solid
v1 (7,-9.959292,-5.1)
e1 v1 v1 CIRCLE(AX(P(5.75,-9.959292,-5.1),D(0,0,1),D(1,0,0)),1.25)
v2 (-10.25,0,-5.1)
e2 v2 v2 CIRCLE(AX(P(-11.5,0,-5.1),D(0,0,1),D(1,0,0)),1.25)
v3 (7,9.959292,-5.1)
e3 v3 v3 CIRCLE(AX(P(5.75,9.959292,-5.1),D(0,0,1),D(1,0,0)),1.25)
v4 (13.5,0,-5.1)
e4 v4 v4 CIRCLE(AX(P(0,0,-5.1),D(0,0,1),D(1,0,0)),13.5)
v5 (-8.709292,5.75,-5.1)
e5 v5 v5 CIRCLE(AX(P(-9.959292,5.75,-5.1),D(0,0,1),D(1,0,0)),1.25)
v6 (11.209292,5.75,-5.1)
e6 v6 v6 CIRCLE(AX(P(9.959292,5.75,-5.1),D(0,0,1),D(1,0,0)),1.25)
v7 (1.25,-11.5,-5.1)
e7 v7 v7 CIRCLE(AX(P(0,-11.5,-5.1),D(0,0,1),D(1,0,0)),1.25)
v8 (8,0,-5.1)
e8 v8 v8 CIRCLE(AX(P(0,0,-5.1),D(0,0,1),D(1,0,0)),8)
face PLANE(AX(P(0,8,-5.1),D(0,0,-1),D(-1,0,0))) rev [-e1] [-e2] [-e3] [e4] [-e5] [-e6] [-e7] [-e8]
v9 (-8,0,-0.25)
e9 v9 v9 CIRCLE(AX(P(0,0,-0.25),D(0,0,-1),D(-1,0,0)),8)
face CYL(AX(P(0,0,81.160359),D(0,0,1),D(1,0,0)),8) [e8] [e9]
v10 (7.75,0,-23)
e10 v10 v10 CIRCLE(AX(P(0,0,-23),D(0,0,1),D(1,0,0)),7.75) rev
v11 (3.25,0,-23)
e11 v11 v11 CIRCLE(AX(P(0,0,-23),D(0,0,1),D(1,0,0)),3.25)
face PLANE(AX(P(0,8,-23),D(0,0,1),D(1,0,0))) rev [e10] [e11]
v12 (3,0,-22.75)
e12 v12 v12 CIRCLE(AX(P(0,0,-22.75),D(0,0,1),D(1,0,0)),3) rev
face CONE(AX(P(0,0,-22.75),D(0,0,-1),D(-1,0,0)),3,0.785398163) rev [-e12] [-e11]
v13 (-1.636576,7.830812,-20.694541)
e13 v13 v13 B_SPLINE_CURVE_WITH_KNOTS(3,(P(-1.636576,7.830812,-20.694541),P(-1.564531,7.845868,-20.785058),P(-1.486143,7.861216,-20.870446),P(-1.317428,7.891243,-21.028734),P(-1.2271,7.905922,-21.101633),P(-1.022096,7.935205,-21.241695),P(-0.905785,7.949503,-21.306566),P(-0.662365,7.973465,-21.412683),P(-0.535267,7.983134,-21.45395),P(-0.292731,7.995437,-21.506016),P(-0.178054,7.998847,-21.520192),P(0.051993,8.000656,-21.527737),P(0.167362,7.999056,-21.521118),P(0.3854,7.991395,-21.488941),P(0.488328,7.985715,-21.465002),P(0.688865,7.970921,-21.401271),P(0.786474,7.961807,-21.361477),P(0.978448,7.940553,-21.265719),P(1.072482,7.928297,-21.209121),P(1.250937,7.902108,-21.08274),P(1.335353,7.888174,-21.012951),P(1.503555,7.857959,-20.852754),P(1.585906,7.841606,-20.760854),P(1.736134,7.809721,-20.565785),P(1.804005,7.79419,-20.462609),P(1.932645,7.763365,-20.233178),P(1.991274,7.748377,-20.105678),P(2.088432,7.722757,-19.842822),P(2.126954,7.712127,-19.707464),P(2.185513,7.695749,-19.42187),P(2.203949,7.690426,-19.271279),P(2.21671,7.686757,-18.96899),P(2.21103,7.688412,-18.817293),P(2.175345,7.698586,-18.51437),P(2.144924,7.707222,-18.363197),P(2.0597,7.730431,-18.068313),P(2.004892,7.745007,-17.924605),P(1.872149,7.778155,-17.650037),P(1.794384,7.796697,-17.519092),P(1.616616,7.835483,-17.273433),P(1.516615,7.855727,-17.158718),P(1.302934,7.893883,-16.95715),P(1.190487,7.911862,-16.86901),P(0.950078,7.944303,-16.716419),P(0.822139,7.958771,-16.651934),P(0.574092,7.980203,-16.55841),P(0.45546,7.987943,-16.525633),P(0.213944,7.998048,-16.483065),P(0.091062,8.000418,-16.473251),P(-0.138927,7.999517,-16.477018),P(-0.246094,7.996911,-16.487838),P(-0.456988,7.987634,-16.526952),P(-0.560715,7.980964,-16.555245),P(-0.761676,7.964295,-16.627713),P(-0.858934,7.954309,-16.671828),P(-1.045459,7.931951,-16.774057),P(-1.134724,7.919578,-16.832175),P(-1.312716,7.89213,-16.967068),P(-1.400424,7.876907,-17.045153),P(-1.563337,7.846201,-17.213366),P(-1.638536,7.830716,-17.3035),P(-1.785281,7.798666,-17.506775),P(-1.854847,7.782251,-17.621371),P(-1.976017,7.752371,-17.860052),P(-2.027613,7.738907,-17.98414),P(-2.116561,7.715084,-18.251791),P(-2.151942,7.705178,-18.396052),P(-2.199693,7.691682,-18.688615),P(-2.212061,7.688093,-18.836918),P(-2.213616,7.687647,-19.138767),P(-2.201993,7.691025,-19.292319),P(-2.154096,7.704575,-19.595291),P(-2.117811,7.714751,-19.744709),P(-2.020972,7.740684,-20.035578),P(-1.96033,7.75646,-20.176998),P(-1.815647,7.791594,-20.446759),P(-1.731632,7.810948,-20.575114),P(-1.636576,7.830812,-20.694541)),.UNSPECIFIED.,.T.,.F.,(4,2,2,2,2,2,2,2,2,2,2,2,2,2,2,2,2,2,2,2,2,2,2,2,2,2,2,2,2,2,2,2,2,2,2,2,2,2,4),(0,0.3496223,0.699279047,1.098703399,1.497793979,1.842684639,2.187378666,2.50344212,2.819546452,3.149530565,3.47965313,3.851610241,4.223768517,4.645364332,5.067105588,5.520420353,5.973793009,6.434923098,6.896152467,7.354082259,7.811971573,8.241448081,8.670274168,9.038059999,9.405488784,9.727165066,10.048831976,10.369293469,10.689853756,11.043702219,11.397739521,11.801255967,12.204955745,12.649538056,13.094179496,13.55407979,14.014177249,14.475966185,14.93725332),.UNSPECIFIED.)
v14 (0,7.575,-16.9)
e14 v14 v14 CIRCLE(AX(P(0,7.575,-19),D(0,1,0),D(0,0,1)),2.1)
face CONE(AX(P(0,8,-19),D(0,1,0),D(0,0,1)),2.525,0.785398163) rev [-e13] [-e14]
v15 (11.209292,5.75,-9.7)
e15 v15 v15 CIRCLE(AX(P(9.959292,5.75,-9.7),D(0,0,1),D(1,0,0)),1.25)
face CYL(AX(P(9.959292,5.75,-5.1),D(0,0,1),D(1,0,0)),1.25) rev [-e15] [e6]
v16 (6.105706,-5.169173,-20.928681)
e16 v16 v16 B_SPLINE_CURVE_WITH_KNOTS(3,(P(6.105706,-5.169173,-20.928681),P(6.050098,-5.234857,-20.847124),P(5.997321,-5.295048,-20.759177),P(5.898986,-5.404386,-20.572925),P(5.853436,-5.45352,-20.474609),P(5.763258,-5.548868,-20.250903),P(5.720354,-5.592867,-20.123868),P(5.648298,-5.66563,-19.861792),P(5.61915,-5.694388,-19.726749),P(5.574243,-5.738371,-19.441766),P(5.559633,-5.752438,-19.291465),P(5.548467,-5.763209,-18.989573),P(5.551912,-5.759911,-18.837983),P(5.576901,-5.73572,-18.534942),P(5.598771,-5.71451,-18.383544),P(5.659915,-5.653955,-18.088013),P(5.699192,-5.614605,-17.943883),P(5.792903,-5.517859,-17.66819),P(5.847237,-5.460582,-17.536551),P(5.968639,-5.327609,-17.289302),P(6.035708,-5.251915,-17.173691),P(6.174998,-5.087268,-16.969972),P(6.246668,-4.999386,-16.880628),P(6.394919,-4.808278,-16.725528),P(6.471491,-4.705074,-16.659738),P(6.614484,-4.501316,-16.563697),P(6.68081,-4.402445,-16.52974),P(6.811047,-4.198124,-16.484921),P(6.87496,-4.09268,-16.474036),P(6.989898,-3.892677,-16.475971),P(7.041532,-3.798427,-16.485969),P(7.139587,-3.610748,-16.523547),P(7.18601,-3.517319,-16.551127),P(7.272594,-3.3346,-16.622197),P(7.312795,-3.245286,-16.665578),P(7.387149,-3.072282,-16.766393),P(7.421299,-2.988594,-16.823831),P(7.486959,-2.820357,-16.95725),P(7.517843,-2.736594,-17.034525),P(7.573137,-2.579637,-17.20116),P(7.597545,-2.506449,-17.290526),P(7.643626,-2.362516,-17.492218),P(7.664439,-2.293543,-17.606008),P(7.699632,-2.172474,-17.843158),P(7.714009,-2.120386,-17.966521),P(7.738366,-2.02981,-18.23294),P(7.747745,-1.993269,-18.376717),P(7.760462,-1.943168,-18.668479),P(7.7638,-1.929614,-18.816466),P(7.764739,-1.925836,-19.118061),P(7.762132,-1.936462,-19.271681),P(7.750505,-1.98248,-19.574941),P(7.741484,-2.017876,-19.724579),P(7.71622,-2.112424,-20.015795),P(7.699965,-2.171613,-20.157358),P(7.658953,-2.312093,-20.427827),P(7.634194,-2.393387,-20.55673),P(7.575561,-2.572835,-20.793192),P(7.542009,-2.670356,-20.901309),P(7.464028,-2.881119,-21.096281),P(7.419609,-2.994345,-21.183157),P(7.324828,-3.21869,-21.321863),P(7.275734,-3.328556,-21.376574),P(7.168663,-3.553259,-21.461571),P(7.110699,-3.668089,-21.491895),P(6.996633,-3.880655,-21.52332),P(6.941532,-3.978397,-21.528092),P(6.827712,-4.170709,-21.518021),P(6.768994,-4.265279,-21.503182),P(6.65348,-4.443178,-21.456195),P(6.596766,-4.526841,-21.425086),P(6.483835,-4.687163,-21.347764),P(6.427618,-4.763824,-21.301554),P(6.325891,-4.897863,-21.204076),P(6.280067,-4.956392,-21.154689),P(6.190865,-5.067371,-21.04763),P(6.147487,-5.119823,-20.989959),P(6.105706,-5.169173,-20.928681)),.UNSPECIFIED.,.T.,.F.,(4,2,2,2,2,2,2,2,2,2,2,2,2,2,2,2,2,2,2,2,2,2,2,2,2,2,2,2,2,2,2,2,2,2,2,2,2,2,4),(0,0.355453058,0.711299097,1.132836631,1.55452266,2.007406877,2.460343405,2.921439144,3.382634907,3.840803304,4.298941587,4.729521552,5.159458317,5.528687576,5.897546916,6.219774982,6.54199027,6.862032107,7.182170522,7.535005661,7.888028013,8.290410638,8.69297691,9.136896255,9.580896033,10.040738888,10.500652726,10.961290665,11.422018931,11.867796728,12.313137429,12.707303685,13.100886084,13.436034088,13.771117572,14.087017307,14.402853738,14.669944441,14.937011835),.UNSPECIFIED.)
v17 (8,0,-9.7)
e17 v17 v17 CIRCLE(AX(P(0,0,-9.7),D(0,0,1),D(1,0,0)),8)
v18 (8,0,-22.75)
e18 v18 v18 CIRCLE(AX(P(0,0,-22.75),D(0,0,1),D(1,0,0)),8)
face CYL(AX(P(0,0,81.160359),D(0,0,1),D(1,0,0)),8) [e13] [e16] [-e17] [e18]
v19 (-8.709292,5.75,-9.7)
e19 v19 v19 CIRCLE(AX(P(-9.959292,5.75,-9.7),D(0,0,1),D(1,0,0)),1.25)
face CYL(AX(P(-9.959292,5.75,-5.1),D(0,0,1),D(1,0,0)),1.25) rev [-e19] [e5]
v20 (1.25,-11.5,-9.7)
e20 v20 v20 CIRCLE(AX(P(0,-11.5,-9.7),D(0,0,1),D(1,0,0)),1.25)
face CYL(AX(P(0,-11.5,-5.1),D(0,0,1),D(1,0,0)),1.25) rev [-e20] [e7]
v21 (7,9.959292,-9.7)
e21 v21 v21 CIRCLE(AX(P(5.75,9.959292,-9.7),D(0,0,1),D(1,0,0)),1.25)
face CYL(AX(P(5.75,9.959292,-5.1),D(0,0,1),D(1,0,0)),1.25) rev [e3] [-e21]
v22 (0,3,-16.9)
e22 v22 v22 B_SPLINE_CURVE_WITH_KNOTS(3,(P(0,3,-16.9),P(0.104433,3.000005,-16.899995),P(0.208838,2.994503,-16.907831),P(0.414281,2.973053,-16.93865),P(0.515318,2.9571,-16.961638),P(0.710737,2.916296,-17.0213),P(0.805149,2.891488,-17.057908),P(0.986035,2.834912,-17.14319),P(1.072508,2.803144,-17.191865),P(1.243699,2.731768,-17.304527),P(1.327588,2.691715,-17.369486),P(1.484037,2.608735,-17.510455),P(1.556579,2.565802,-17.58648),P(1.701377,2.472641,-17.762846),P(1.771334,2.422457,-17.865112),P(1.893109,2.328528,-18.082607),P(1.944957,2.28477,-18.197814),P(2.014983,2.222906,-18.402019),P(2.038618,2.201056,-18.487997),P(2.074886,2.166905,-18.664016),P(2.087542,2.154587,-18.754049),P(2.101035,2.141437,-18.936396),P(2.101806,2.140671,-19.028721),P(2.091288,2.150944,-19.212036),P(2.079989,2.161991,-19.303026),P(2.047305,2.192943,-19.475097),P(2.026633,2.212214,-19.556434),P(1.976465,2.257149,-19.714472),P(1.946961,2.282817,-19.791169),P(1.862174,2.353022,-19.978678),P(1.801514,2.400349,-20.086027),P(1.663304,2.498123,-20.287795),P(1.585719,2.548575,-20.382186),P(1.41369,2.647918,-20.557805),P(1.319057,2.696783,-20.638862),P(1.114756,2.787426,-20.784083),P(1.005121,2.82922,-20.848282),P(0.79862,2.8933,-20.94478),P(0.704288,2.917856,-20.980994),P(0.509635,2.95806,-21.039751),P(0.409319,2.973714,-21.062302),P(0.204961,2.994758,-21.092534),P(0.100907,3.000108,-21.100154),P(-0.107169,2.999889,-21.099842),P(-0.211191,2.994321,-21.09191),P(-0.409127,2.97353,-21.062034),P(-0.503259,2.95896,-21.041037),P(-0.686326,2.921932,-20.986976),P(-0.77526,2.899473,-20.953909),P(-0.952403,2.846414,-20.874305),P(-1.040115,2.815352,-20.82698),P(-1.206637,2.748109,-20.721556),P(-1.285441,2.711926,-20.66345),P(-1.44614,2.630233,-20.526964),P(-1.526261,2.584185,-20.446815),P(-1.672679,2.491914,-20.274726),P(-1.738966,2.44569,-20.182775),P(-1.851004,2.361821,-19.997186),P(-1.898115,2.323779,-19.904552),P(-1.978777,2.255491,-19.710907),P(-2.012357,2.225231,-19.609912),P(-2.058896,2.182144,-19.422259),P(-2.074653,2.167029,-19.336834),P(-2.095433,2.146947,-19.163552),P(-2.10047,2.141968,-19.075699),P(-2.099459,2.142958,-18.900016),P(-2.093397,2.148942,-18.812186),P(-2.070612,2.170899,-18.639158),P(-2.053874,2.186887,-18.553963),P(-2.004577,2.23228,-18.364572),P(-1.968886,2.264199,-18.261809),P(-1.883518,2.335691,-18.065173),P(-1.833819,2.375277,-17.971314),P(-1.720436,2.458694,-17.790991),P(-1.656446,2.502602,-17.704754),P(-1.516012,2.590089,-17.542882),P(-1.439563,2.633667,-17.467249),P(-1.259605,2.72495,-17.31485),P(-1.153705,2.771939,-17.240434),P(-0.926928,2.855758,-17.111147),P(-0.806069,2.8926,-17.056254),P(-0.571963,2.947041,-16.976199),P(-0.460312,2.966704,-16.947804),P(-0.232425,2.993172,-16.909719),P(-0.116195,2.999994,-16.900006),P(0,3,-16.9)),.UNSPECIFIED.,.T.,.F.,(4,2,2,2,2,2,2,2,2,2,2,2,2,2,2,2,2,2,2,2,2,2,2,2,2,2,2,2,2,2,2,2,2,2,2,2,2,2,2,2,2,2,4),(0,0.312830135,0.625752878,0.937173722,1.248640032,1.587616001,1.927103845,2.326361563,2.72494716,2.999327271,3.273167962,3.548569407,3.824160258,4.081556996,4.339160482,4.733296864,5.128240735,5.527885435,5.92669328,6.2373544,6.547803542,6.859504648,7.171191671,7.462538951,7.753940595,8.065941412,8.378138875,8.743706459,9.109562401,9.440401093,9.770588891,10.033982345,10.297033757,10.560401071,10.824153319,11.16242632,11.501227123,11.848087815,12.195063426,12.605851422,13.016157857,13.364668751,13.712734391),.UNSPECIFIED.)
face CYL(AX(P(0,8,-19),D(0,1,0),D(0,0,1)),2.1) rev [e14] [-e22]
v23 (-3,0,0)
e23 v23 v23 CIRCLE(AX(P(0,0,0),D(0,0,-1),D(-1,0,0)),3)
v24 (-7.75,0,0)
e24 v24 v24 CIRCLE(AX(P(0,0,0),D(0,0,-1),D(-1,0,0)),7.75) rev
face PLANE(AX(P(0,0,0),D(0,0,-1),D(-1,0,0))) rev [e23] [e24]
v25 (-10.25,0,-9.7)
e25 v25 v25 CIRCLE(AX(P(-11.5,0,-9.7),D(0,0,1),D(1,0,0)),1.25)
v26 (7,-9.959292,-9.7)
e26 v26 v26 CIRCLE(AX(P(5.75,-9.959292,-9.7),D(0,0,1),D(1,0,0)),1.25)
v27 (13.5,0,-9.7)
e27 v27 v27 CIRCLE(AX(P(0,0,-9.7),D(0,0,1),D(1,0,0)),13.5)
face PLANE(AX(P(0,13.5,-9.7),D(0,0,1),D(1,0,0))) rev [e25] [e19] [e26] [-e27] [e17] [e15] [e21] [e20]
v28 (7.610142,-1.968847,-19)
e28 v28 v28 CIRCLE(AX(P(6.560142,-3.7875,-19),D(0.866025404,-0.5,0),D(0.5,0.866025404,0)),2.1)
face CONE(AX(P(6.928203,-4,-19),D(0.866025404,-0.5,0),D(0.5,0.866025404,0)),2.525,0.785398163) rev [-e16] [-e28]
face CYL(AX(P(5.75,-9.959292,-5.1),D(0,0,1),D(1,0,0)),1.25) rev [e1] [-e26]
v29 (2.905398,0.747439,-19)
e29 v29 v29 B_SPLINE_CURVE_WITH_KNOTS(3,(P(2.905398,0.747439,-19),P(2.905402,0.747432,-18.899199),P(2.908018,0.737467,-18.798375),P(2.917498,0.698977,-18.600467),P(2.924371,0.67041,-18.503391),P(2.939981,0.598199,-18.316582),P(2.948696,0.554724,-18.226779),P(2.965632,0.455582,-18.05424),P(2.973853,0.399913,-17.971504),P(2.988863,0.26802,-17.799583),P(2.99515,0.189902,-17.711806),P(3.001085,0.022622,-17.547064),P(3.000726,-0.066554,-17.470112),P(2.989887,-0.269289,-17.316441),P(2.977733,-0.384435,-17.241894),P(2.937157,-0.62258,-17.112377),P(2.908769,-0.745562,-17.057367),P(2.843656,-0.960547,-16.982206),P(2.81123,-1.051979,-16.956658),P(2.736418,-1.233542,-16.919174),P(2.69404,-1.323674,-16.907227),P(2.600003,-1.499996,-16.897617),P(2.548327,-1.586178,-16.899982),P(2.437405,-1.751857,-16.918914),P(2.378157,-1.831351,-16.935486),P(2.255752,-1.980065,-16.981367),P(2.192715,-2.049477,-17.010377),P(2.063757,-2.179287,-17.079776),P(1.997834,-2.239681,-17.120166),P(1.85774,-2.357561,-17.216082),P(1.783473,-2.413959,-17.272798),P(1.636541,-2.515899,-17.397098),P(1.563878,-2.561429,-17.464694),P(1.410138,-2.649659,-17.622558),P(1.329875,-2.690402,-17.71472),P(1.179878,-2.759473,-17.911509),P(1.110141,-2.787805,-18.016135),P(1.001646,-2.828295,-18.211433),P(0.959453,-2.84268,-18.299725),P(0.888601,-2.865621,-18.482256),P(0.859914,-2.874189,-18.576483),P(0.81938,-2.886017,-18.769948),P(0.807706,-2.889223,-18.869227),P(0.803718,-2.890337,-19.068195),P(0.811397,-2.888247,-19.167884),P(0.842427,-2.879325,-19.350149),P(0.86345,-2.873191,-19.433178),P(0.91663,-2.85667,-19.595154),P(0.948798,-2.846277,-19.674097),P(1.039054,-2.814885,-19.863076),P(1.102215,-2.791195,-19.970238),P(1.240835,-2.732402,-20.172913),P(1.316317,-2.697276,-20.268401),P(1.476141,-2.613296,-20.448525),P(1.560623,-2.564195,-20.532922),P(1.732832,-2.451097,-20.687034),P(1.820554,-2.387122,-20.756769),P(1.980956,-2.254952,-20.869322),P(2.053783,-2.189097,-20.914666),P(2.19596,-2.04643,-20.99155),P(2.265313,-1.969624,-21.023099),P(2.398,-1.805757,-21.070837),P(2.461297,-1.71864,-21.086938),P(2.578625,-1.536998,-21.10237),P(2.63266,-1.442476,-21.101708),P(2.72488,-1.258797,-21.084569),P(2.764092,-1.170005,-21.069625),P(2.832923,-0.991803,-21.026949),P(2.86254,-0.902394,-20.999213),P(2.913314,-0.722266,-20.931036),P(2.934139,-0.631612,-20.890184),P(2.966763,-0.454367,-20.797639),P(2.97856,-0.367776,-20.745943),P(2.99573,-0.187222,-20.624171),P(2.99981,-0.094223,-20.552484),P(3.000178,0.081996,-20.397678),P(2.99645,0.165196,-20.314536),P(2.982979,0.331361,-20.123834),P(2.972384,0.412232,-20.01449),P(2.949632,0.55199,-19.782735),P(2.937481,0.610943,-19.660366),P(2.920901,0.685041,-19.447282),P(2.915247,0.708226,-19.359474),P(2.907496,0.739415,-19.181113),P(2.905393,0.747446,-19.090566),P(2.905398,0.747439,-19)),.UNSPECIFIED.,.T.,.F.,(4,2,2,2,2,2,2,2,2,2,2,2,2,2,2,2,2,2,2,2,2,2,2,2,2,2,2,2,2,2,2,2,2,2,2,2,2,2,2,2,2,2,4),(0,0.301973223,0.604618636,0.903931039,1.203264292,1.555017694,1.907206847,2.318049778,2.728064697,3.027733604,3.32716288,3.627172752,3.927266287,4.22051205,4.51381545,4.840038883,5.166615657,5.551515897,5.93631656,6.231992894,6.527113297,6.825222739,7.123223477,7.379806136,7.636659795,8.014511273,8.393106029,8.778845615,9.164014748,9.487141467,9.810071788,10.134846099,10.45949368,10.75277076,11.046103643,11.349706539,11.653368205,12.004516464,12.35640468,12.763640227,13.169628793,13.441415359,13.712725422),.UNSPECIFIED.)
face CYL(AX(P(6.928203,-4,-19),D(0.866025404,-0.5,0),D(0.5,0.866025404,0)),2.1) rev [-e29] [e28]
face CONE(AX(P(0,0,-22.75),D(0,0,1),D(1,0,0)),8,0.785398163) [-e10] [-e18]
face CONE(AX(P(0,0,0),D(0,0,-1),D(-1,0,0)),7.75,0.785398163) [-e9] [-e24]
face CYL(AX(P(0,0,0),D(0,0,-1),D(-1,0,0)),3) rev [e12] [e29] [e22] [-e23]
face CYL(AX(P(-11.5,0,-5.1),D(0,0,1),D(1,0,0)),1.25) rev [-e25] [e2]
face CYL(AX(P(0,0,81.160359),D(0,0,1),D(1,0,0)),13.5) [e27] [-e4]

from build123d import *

# Parameters (mm, degrees)
SKETCH_2_R          = 3
CUT_EXTRUDE_1_DEPTH = 30.891470355
CHAMFER_1_SIZE      = 0.25
HOLE_WIZARD_M3_1_D  = 2.5


# Read off the part's stored shape, not the designer's step: M5 螺纹孔1
with BuildPart() as part:
    # 草图1 → 旋转1 (revolve)
    with BuildSketch(Plane(origin=(0, 0, 0), x_dir=(0, 0, -1), z_dir=(1, 0, 0)), mode=Mode.PRIVATE) as revolve_1_sk:
        Polygon((0, 0), (0, 8), (5.1, 8), (5.1, 13.5), (9.7, 13.5), (9.7, 8), (23, 8), (23, 0), align=None)
    revolve(revolve_1_sk.sketch.rotate(Axis((0, 0, 81.160359106), (0, 0, -1)), 90), axis=Axis((0, 0, 81.160359106), (0, 0, -1)))

    # 草图2 → 切除-拉伸1 (cut, through all)
    with BuildSketch(Plane(origin=(0, 0, -23), x_dir=(-1, 0, 0), z_dir=(0, 0, -1))):
        Circle(SKETCH_2_R)
    extrude(amount=-CUT_EXTRUDE_1_DEPTH, mode=Mode.SUBTRACT)

    # M5 螺纹孔1 outline → M5 螺纹孔1 (revolve, cut)
    with BuildSketch(Plane.XY.offset(-19)):
        Polygon((2.52511429, 8.00011429), (0, 8.00011429), (0, 2.141949197), (2.1, 2.141949197), (2.1, 7.575), align=None)
    revolve(axis=Axis((0, 0, -19), (0, 1, 0)), mode=Mode.SUBTRACT)

    # Hole Wizard M5 _1 2 outline → Hole Wizard M5 _1 2 (revolve, cut)
    with BuildSketch(Plane(origin=(0, 0, -19), x_dir=(0.49999999999999767, 0.86602540378444, 0), z_dir=(0, 0, -1))):
        Polygon((2.525122236, 8.000122236), (0, 8.000122236), (0, 2.1419531), (2.1, 2.1419531), (2.1, 7.575), align=None)
    revolve(axis=Axis((0, 0, -19), (0.8660254037844403, -0.4999999999999978, 0)), mode=Mode.SUBTRACT)

    # 倒角1
    chamfer_1_edges = [part.edges().sort_by_distance(p)[0] for p in [
        (3, 0, -23),
        (-8, 0, -23),
        (-8, 0, 0),
    ]]
    chamfer(chamfer_1_edges, length=CHAMFER_1_SIZE)

    # M3 螺纹孔1 (through all)
    with Locations(Plane(origin=(-11.5, 0, -5.1), x_dir=(1, 0, 0), z_dir=(0, 0, 1))):
        with Locations((0, 0), (17.25, -9.959292144), (17.25, 9.959292144), (1.540707856, 5.75), (11.5, -11.5), (21.459292144, 5.75)):
            Hole(HOLE_WIZARD_M3_1_D / 2)


solid = part.part
